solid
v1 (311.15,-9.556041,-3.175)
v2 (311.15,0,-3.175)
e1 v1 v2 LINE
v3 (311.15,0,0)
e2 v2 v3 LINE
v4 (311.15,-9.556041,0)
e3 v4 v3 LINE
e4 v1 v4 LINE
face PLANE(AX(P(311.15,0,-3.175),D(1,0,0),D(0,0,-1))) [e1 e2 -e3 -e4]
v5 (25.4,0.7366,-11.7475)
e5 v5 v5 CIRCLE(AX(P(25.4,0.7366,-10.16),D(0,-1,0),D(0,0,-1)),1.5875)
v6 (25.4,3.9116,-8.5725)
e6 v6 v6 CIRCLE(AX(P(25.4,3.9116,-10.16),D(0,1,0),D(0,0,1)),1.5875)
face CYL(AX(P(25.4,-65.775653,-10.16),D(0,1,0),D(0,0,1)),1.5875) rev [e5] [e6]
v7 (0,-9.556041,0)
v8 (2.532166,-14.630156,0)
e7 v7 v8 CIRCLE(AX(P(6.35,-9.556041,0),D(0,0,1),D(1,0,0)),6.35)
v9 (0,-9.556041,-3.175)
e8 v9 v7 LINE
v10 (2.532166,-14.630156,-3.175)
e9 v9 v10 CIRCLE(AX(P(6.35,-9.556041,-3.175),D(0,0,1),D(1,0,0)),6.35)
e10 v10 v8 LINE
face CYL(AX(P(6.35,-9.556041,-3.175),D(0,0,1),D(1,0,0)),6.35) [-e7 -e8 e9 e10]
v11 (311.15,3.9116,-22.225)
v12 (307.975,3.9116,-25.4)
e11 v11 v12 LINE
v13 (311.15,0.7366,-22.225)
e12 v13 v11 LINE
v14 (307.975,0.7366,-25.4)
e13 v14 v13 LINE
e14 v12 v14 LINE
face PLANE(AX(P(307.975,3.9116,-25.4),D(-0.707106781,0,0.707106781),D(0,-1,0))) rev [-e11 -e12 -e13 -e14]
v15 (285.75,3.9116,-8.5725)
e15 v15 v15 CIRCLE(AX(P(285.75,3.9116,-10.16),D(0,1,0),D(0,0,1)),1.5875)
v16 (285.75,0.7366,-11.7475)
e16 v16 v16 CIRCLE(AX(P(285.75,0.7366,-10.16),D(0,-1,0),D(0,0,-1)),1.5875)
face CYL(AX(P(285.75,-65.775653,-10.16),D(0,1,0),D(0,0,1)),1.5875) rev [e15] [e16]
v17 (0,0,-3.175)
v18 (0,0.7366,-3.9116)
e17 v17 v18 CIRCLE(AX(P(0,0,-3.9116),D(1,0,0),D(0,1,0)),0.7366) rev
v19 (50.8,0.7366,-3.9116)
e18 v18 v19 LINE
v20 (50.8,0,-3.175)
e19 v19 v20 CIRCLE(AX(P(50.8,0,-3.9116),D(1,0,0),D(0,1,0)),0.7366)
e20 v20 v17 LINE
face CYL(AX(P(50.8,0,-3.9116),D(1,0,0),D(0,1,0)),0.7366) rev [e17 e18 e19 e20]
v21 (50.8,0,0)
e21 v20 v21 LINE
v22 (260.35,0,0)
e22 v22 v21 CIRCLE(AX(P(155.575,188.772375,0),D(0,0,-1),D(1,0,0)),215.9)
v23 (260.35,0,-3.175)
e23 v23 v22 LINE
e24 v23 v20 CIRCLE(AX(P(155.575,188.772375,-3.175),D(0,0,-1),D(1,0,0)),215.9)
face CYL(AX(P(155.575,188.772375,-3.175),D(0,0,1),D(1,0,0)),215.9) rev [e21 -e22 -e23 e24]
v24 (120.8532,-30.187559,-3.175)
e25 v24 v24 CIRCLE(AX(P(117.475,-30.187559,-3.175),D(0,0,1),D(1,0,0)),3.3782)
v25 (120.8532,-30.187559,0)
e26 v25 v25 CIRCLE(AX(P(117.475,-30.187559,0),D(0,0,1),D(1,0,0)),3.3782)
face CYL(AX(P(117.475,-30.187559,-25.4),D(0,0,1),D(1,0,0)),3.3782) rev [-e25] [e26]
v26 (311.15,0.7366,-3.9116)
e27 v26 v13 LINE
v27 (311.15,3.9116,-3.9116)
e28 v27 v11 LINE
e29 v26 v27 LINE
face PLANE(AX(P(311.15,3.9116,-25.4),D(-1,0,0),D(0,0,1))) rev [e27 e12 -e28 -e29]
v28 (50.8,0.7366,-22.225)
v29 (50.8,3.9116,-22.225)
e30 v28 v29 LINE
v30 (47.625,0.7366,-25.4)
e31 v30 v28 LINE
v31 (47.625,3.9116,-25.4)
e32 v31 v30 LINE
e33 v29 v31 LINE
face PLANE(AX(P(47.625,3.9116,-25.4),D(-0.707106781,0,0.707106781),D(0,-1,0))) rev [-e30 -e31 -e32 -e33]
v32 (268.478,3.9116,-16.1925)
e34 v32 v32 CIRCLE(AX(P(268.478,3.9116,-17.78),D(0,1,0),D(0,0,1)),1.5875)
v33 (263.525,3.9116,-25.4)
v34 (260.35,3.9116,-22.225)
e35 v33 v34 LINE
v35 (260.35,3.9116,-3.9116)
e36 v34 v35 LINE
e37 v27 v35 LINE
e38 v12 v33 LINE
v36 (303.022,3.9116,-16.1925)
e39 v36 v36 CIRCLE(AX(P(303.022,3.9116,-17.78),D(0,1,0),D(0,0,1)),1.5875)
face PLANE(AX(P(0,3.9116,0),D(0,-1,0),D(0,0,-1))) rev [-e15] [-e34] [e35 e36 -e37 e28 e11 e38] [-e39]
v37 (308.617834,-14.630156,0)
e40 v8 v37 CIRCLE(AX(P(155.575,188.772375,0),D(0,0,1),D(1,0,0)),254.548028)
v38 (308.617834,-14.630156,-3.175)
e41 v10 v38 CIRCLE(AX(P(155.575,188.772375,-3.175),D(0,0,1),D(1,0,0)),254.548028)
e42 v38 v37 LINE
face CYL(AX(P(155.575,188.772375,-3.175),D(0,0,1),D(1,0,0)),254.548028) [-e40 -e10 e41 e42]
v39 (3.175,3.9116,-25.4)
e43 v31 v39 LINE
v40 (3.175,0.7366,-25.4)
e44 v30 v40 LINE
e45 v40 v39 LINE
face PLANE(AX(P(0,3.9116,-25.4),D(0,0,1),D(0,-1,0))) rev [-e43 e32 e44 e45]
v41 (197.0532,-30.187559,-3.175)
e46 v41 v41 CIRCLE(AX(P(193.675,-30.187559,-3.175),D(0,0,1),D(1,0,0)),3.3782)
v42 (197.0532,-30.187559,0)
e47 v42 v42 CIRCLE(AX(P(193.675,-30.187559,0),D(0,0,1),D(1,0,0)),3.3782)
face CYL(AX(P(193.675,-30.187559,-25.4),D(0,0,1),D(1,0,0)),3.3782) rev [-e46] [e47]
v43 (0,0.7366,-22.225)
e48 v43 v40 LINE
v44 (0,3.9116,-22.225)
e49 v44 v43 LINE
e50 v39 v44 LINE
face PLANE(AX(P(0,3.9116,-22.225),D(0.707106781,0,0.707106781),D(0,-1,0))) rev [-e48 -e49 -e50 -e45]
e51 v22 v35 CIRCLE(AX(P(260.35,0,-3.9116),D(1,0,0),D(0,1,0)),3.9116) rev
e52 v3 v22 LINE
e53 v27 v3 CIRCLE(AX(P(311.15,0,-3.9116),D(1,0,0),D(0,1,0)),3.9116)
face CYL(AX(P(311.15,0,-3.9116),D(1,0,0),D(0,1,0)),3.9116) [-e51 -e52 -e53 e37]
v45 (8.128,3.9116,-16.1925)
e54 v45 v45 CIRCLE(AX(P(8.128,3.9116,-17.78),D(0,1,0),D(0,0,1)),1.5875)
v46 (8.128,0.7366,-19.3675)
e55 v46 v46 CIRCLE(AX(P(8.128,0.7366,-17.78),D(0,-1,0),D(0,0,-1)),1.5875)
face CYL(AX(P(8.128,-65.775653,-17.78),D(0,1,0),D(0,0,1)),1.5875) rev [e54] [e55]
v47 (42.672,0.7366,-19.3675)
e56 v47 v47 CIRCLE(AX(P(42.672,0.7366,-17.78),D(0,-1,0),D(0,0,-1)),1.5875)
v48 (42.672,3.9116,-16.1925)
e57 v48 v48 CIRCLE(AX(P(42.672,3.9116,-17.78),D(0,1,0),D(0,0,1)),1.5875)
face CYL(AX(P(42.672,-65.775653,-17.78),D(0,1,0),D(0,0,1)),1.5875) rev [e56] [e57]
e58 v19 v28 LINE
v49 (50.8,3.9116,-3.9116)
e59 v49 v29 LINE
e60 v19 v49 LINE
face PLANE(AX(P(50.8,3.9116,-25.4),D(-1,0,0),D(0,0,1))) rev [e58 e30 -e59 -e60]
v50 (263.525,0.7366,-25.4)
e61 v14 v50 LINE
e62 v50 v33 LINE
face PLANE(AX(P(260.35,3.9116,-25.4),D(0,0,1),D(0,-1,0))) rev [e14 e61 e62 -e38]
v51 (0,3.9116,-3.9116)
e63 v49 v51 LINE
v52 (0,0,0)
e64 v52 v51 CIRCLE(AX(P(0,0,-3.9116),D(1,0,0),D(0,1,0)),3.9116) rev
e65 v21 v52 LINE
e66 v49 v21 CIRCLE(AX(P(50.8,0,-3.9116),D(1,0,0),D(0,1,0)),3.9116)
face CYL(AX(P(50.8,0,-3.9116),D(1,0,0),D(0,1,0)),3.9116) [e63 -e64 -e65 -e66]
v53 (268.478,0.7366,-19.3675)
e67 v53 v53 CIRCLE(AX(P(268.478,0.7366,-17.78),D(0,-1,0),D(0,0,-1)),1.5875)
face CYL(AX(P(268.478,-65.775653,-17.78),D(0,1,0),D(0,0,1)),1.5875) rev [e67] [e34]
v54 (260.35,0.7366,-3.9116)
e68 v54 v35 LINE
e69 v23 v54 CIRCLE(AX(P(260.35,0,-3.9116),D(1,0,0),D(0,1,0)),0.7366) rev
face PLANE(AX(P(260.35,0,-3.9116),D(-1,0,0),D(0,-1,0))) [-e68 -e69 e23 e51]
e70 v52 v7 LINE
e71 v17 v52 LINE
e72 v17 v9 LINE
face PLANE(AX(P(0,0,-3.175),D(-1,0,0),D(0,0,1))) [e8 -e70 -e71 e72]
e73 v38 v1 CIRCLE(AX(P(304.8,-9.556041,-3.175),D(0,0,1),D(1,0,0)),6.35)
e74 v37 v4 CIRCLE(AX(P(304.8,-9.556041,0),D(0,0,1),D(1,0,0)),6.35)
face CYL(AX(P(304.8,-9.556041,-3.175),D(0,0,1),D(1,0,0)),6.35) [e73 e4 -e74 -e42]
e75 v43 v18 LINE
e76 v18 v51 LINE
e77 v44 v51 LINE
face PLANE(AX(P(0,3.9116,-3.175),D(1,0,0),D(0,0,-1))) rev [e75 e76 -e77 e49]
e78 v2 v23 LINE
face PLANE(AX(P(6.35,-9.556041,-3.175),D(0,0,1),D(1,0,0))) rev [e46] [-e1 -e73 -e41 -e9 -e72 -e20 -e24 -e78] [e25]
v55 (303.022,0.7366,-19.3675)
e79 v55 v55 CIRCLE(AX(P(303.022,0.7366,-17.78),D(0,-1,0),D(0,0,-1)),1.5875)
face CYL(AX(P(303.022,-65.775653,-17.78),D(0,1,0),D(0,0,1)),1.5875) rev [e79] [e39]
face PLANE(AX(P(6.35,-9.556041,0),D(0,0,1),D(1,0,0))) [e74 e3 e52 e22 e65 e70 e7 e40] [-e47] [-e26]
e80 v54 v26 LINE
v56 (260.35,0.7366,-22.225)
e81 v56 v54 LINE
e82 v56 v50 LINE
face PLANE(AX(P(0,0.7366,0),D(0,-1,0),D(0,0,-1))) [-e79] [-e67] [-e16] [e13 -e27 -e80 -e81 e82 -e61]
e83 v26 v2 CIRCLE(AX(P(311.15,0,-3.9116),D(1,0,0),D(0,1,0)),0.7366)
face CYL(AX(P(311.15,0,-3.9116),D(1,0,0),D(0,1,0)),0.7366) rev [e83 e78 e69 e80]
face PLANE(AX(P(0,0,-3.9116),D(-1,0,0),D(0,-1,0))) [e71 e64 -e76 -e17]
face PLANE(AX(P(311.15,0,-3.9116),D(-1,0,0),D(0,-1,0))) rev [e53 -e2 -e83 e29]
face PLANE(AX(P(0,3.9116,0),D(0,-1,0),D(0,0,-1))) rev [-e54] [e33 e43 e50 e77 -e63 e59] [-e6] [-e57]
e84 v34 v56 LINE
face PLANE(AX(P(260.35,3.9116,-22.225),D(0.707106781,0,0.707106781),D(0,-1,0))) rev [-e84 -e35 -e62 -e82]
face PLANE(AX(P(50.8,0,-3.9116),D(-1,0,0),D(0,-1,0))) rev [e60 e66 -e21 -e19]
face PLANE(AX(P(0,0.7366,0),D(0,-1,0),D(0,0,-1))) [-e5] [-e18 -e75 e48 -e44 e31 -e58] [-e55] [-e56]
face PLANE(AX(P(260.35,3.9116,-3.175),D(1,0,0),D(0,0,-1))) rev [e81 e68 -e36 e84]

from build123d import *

# Parameters (mm, degrees)
BASE_FLANGE1_DEPTH        = 3.175
EDGE_FLANGE1_DEPTH        = 50.8
EDGE_FLANGE1_BEND_DEPTH   = 50.8
SKETCH25_R                = 3.3782
CUT_EXTRUDE1_DEPTH        = 320.039055649
BREAK_CORNER1_START       = 15.715448212
BREAK_CORNER1_OUTLINE_W   = 184.095250482
BREAK_CORNER1_OUTLINE_H   = 6
BREAK_CORNER1_DEPTH       = 152.664354058
BREAK_CORNER1_START_2     = -17.960512242
BREAK_CORNER1_2_OUTLINE_W = 37.636472696
BREAK_CORNER1_2_OUTLINE_H = 6
BREAK_CORNER1_2_DEPTH     = 2.24506403
BREAK_CORNER1_START_3     = 199.810698694
BREAK_CORNER1_3_OUTLINE_W = 2.268276822
BREAK_CORNER1_3_OUTLINE_H = 6
BREAK_CORNER1_3_DEPTH     = 4.49012806
SKETCH26_R                = 1.5875
CUT_EXTRUDE2_DEPTH        = 320.868403774
SKETCH27_R                = 1.5875
CUT_EXTRUDE3_DEPTH        = 320.868403774


# Read off the part's stored shape, not the designer's step: Break-Corner1
# Sheet-metal steps are written as plain solids
with BuildPart() as part:
    # Sketch2 → Base-Flange1 (new body)
    with BuildSketch(Plane.XY):
        with BuildLine():
            Line((0, 0), (50.8, 0))
            ThreePointArc((50.8, 0), (155.575, -27.127625498), (260.35, 0))
            Line((260.35, 0), (311.15, 0))
            Line((311.15, 0), (311.15, -9.556040603))
            ThreePointArc((311.15, -9.556040603), (310.481801777, -12.39146448), (308.617833524, -14.630156012))
            ThreePointArc((308.617833524, -14.630156012), (155.575, -65.775653014), (2.532166476, -14.630156012))
            ThreePointArc((2.532166476, -14.630156012), (0.668198223, -12.39146448), (0, -9.556040603))
            Line((0, -9.556040603), (0, 0))
        make_face()
    extrude(amount=-BASE_FLANGE1_DEPTH)

    # Edge-Flange1 section (across the edge) → Edge-Flange1 (add)
    with BuildSketch(Plane(origin=(0, 0.7366, -3.175), x_dir=(0, -1, 0), z_dir=(1, 0, 0))):
        with BuildLine():
            Line((-3.175, 0.7366), (-3.175, 22.225))
            Line((-3.175, 22.225), (0, 22.225))
            Line((0, 22.225), (0, 0.7366))
            ThreePointArc((0, 0.7366), (0.215745145, 0.215745145), (0.7366, 0))
            Line((0.7366, 0), (0.7366, -3.175))
            ThreePointArc((0.7366, -3.175), (-2.029318885, -2.029318885), (-3.175, 0.7366))
        make_face()
    extrude(amount=EDGE_FLANGE1_DEPTH)

    # Edge-Flange1 section 2 (across the edge) → Edge-Flange1 bend (add)
    with BuildSketch(Plane(origin=(260.35, 0.7366, -3.175), x_dir=(0, -1, 0), z_dir=(1, 0, 0))):
        with BuildLine():
            Line((-3.175, 0.7366), (-3.175, 22.225))
            Line((-3.175, 22.225), (0, 22.225))
            Line((0, 22.225), (0, 0.7366))
            ThreePointArc((0, 0.7366), (0.215745145, 0.215745145), (0.7366, 0))
            Line((0.7366, 0), (0.7366, -3.175))
            ThreePointArc((0.7366, -3.175), (-2.029318885, -2.029318885), (-3.175, 0.7366))
        make_face()
    extrude(amount=EDGE_FLANGE1_BEND_DEPTH)

    # Sketch25 → Cut-Extrude1 (cut, through all)
    with BuildSketch(Plane.XY):
        with Locations((117.475, -30.187559048)):
            Circle(SKETCH25_R)
        with Locations((193.675, -30.187559048)):
            Circle(SKETCH25_R)
    extrude(amount=-CUT_EXTRUDE1_DEPTH, mode=Mode.SUBTRACT)

    # Break-Corner1 outline → Break-Corner1 (cut)
    with BuildSketch(Plane(origin=(0, 0, 0), x_dir=(0.707106781186548, 0, -0.707106781186547), z_dir=(0.707106781186547, 0, 0.707106781186548)).offset(BREAK_CORNER1_START)):
        with Locations((143.684097937, 2)):
            Rectangle(BREAK_CORNER1_OUTLINE_W, BREAK_CORNER1_OUTLINE_H)
    extrude(amount=BREAK_CORNER1_DEPTH, mode=Mode.SUBTRACT)

    # Break-Corner1 2 outline → Break-Corner1 2 (cut)
    with BuildSketch(Plane(origin=(0, 0, 0), x_dir=(0.707106781186548, 0, -0.707106781186547), z_dir=(0.707106781186547, 0, 0.707106781186548)).offset(BREAK_CORNER1_START_2)):
        with Locations((32.818236348, 2)):
            Rectangle(BREAK_CORNER1_2_OUTLINE_W, BREAK_CORNER1_2_OUTLINE_H)
    extrude(amount=BREAK_CORNER1_2_DEPTH, mode=Mode.SUBTRACT)

    # Break-Corner1 3 outline → Break-Corner1 3 (cut)
    with BuildSketch(Plane(origin=(0, 0, 0), x_dir=(0.707106781186548, 0, -0.707106781186547), z_dir=(0.707106781186547, 0, 0.707106781186548)).offset(BREAK_CORNER1_START_3)):
        with Locations((236.865861589, 2)):
            Rectangle(BREAK_CORNER1_3_OUTLINE_W, BREAK_CORNER1_3_OUTLINE_H)
    extrude(amount=BREAK_CORNER1_3_DEPTH, mode=Mode.SUBTRACT)

    # Sketch26 → Cut-Extrude2 (cut, through all)
    with BuildSketch(Plane(origin=(0, 3.9116, 0), x_dir=(1, 0, 0), z_dir=(0, 1, 0))):
        with Locations(Location((8.128, 17.78, 0), (0, 0, 270))):
            Circle(SKETCH26_R)
        with Locations(Location((25.4, 10.16, 0), (0, 0, 270))):
            Circle(SKETCH26_R)
        with Locations(Location((42.672, 17.78, 0), (0, 0, 270))):
            Circle(SKETCH26_R)
    extrude(amount=-CUT_EXTRUDE2_DEPTH, mode=Mode.SUBTRACT)

    # Sketch27 → Cut-Extrude3 (cut, through all)
    with BuildSketch(Plane(origin=(0, 3.9116, 0), x_dir=(1, 0, 0), z_dir=(0, 1, 0))):
        with Locations(Location((268.478, 17.78, 0), (0, 0, 270))):
            Circle(SKETCH27_R)
        with Locations(Location((303.022, 17.78, 0), (0, 0, 270))):
            Circle(SKETCH27_R)
        with Locations(Location((285.75, 10.16, 0), (0, 0, 270))):
            Circle(SKETCH27_R)
    extrude(amount=-CUT_EXTRUDE3_DEPTH, mode=Mode.SUBTRACT)


solid = part.part
